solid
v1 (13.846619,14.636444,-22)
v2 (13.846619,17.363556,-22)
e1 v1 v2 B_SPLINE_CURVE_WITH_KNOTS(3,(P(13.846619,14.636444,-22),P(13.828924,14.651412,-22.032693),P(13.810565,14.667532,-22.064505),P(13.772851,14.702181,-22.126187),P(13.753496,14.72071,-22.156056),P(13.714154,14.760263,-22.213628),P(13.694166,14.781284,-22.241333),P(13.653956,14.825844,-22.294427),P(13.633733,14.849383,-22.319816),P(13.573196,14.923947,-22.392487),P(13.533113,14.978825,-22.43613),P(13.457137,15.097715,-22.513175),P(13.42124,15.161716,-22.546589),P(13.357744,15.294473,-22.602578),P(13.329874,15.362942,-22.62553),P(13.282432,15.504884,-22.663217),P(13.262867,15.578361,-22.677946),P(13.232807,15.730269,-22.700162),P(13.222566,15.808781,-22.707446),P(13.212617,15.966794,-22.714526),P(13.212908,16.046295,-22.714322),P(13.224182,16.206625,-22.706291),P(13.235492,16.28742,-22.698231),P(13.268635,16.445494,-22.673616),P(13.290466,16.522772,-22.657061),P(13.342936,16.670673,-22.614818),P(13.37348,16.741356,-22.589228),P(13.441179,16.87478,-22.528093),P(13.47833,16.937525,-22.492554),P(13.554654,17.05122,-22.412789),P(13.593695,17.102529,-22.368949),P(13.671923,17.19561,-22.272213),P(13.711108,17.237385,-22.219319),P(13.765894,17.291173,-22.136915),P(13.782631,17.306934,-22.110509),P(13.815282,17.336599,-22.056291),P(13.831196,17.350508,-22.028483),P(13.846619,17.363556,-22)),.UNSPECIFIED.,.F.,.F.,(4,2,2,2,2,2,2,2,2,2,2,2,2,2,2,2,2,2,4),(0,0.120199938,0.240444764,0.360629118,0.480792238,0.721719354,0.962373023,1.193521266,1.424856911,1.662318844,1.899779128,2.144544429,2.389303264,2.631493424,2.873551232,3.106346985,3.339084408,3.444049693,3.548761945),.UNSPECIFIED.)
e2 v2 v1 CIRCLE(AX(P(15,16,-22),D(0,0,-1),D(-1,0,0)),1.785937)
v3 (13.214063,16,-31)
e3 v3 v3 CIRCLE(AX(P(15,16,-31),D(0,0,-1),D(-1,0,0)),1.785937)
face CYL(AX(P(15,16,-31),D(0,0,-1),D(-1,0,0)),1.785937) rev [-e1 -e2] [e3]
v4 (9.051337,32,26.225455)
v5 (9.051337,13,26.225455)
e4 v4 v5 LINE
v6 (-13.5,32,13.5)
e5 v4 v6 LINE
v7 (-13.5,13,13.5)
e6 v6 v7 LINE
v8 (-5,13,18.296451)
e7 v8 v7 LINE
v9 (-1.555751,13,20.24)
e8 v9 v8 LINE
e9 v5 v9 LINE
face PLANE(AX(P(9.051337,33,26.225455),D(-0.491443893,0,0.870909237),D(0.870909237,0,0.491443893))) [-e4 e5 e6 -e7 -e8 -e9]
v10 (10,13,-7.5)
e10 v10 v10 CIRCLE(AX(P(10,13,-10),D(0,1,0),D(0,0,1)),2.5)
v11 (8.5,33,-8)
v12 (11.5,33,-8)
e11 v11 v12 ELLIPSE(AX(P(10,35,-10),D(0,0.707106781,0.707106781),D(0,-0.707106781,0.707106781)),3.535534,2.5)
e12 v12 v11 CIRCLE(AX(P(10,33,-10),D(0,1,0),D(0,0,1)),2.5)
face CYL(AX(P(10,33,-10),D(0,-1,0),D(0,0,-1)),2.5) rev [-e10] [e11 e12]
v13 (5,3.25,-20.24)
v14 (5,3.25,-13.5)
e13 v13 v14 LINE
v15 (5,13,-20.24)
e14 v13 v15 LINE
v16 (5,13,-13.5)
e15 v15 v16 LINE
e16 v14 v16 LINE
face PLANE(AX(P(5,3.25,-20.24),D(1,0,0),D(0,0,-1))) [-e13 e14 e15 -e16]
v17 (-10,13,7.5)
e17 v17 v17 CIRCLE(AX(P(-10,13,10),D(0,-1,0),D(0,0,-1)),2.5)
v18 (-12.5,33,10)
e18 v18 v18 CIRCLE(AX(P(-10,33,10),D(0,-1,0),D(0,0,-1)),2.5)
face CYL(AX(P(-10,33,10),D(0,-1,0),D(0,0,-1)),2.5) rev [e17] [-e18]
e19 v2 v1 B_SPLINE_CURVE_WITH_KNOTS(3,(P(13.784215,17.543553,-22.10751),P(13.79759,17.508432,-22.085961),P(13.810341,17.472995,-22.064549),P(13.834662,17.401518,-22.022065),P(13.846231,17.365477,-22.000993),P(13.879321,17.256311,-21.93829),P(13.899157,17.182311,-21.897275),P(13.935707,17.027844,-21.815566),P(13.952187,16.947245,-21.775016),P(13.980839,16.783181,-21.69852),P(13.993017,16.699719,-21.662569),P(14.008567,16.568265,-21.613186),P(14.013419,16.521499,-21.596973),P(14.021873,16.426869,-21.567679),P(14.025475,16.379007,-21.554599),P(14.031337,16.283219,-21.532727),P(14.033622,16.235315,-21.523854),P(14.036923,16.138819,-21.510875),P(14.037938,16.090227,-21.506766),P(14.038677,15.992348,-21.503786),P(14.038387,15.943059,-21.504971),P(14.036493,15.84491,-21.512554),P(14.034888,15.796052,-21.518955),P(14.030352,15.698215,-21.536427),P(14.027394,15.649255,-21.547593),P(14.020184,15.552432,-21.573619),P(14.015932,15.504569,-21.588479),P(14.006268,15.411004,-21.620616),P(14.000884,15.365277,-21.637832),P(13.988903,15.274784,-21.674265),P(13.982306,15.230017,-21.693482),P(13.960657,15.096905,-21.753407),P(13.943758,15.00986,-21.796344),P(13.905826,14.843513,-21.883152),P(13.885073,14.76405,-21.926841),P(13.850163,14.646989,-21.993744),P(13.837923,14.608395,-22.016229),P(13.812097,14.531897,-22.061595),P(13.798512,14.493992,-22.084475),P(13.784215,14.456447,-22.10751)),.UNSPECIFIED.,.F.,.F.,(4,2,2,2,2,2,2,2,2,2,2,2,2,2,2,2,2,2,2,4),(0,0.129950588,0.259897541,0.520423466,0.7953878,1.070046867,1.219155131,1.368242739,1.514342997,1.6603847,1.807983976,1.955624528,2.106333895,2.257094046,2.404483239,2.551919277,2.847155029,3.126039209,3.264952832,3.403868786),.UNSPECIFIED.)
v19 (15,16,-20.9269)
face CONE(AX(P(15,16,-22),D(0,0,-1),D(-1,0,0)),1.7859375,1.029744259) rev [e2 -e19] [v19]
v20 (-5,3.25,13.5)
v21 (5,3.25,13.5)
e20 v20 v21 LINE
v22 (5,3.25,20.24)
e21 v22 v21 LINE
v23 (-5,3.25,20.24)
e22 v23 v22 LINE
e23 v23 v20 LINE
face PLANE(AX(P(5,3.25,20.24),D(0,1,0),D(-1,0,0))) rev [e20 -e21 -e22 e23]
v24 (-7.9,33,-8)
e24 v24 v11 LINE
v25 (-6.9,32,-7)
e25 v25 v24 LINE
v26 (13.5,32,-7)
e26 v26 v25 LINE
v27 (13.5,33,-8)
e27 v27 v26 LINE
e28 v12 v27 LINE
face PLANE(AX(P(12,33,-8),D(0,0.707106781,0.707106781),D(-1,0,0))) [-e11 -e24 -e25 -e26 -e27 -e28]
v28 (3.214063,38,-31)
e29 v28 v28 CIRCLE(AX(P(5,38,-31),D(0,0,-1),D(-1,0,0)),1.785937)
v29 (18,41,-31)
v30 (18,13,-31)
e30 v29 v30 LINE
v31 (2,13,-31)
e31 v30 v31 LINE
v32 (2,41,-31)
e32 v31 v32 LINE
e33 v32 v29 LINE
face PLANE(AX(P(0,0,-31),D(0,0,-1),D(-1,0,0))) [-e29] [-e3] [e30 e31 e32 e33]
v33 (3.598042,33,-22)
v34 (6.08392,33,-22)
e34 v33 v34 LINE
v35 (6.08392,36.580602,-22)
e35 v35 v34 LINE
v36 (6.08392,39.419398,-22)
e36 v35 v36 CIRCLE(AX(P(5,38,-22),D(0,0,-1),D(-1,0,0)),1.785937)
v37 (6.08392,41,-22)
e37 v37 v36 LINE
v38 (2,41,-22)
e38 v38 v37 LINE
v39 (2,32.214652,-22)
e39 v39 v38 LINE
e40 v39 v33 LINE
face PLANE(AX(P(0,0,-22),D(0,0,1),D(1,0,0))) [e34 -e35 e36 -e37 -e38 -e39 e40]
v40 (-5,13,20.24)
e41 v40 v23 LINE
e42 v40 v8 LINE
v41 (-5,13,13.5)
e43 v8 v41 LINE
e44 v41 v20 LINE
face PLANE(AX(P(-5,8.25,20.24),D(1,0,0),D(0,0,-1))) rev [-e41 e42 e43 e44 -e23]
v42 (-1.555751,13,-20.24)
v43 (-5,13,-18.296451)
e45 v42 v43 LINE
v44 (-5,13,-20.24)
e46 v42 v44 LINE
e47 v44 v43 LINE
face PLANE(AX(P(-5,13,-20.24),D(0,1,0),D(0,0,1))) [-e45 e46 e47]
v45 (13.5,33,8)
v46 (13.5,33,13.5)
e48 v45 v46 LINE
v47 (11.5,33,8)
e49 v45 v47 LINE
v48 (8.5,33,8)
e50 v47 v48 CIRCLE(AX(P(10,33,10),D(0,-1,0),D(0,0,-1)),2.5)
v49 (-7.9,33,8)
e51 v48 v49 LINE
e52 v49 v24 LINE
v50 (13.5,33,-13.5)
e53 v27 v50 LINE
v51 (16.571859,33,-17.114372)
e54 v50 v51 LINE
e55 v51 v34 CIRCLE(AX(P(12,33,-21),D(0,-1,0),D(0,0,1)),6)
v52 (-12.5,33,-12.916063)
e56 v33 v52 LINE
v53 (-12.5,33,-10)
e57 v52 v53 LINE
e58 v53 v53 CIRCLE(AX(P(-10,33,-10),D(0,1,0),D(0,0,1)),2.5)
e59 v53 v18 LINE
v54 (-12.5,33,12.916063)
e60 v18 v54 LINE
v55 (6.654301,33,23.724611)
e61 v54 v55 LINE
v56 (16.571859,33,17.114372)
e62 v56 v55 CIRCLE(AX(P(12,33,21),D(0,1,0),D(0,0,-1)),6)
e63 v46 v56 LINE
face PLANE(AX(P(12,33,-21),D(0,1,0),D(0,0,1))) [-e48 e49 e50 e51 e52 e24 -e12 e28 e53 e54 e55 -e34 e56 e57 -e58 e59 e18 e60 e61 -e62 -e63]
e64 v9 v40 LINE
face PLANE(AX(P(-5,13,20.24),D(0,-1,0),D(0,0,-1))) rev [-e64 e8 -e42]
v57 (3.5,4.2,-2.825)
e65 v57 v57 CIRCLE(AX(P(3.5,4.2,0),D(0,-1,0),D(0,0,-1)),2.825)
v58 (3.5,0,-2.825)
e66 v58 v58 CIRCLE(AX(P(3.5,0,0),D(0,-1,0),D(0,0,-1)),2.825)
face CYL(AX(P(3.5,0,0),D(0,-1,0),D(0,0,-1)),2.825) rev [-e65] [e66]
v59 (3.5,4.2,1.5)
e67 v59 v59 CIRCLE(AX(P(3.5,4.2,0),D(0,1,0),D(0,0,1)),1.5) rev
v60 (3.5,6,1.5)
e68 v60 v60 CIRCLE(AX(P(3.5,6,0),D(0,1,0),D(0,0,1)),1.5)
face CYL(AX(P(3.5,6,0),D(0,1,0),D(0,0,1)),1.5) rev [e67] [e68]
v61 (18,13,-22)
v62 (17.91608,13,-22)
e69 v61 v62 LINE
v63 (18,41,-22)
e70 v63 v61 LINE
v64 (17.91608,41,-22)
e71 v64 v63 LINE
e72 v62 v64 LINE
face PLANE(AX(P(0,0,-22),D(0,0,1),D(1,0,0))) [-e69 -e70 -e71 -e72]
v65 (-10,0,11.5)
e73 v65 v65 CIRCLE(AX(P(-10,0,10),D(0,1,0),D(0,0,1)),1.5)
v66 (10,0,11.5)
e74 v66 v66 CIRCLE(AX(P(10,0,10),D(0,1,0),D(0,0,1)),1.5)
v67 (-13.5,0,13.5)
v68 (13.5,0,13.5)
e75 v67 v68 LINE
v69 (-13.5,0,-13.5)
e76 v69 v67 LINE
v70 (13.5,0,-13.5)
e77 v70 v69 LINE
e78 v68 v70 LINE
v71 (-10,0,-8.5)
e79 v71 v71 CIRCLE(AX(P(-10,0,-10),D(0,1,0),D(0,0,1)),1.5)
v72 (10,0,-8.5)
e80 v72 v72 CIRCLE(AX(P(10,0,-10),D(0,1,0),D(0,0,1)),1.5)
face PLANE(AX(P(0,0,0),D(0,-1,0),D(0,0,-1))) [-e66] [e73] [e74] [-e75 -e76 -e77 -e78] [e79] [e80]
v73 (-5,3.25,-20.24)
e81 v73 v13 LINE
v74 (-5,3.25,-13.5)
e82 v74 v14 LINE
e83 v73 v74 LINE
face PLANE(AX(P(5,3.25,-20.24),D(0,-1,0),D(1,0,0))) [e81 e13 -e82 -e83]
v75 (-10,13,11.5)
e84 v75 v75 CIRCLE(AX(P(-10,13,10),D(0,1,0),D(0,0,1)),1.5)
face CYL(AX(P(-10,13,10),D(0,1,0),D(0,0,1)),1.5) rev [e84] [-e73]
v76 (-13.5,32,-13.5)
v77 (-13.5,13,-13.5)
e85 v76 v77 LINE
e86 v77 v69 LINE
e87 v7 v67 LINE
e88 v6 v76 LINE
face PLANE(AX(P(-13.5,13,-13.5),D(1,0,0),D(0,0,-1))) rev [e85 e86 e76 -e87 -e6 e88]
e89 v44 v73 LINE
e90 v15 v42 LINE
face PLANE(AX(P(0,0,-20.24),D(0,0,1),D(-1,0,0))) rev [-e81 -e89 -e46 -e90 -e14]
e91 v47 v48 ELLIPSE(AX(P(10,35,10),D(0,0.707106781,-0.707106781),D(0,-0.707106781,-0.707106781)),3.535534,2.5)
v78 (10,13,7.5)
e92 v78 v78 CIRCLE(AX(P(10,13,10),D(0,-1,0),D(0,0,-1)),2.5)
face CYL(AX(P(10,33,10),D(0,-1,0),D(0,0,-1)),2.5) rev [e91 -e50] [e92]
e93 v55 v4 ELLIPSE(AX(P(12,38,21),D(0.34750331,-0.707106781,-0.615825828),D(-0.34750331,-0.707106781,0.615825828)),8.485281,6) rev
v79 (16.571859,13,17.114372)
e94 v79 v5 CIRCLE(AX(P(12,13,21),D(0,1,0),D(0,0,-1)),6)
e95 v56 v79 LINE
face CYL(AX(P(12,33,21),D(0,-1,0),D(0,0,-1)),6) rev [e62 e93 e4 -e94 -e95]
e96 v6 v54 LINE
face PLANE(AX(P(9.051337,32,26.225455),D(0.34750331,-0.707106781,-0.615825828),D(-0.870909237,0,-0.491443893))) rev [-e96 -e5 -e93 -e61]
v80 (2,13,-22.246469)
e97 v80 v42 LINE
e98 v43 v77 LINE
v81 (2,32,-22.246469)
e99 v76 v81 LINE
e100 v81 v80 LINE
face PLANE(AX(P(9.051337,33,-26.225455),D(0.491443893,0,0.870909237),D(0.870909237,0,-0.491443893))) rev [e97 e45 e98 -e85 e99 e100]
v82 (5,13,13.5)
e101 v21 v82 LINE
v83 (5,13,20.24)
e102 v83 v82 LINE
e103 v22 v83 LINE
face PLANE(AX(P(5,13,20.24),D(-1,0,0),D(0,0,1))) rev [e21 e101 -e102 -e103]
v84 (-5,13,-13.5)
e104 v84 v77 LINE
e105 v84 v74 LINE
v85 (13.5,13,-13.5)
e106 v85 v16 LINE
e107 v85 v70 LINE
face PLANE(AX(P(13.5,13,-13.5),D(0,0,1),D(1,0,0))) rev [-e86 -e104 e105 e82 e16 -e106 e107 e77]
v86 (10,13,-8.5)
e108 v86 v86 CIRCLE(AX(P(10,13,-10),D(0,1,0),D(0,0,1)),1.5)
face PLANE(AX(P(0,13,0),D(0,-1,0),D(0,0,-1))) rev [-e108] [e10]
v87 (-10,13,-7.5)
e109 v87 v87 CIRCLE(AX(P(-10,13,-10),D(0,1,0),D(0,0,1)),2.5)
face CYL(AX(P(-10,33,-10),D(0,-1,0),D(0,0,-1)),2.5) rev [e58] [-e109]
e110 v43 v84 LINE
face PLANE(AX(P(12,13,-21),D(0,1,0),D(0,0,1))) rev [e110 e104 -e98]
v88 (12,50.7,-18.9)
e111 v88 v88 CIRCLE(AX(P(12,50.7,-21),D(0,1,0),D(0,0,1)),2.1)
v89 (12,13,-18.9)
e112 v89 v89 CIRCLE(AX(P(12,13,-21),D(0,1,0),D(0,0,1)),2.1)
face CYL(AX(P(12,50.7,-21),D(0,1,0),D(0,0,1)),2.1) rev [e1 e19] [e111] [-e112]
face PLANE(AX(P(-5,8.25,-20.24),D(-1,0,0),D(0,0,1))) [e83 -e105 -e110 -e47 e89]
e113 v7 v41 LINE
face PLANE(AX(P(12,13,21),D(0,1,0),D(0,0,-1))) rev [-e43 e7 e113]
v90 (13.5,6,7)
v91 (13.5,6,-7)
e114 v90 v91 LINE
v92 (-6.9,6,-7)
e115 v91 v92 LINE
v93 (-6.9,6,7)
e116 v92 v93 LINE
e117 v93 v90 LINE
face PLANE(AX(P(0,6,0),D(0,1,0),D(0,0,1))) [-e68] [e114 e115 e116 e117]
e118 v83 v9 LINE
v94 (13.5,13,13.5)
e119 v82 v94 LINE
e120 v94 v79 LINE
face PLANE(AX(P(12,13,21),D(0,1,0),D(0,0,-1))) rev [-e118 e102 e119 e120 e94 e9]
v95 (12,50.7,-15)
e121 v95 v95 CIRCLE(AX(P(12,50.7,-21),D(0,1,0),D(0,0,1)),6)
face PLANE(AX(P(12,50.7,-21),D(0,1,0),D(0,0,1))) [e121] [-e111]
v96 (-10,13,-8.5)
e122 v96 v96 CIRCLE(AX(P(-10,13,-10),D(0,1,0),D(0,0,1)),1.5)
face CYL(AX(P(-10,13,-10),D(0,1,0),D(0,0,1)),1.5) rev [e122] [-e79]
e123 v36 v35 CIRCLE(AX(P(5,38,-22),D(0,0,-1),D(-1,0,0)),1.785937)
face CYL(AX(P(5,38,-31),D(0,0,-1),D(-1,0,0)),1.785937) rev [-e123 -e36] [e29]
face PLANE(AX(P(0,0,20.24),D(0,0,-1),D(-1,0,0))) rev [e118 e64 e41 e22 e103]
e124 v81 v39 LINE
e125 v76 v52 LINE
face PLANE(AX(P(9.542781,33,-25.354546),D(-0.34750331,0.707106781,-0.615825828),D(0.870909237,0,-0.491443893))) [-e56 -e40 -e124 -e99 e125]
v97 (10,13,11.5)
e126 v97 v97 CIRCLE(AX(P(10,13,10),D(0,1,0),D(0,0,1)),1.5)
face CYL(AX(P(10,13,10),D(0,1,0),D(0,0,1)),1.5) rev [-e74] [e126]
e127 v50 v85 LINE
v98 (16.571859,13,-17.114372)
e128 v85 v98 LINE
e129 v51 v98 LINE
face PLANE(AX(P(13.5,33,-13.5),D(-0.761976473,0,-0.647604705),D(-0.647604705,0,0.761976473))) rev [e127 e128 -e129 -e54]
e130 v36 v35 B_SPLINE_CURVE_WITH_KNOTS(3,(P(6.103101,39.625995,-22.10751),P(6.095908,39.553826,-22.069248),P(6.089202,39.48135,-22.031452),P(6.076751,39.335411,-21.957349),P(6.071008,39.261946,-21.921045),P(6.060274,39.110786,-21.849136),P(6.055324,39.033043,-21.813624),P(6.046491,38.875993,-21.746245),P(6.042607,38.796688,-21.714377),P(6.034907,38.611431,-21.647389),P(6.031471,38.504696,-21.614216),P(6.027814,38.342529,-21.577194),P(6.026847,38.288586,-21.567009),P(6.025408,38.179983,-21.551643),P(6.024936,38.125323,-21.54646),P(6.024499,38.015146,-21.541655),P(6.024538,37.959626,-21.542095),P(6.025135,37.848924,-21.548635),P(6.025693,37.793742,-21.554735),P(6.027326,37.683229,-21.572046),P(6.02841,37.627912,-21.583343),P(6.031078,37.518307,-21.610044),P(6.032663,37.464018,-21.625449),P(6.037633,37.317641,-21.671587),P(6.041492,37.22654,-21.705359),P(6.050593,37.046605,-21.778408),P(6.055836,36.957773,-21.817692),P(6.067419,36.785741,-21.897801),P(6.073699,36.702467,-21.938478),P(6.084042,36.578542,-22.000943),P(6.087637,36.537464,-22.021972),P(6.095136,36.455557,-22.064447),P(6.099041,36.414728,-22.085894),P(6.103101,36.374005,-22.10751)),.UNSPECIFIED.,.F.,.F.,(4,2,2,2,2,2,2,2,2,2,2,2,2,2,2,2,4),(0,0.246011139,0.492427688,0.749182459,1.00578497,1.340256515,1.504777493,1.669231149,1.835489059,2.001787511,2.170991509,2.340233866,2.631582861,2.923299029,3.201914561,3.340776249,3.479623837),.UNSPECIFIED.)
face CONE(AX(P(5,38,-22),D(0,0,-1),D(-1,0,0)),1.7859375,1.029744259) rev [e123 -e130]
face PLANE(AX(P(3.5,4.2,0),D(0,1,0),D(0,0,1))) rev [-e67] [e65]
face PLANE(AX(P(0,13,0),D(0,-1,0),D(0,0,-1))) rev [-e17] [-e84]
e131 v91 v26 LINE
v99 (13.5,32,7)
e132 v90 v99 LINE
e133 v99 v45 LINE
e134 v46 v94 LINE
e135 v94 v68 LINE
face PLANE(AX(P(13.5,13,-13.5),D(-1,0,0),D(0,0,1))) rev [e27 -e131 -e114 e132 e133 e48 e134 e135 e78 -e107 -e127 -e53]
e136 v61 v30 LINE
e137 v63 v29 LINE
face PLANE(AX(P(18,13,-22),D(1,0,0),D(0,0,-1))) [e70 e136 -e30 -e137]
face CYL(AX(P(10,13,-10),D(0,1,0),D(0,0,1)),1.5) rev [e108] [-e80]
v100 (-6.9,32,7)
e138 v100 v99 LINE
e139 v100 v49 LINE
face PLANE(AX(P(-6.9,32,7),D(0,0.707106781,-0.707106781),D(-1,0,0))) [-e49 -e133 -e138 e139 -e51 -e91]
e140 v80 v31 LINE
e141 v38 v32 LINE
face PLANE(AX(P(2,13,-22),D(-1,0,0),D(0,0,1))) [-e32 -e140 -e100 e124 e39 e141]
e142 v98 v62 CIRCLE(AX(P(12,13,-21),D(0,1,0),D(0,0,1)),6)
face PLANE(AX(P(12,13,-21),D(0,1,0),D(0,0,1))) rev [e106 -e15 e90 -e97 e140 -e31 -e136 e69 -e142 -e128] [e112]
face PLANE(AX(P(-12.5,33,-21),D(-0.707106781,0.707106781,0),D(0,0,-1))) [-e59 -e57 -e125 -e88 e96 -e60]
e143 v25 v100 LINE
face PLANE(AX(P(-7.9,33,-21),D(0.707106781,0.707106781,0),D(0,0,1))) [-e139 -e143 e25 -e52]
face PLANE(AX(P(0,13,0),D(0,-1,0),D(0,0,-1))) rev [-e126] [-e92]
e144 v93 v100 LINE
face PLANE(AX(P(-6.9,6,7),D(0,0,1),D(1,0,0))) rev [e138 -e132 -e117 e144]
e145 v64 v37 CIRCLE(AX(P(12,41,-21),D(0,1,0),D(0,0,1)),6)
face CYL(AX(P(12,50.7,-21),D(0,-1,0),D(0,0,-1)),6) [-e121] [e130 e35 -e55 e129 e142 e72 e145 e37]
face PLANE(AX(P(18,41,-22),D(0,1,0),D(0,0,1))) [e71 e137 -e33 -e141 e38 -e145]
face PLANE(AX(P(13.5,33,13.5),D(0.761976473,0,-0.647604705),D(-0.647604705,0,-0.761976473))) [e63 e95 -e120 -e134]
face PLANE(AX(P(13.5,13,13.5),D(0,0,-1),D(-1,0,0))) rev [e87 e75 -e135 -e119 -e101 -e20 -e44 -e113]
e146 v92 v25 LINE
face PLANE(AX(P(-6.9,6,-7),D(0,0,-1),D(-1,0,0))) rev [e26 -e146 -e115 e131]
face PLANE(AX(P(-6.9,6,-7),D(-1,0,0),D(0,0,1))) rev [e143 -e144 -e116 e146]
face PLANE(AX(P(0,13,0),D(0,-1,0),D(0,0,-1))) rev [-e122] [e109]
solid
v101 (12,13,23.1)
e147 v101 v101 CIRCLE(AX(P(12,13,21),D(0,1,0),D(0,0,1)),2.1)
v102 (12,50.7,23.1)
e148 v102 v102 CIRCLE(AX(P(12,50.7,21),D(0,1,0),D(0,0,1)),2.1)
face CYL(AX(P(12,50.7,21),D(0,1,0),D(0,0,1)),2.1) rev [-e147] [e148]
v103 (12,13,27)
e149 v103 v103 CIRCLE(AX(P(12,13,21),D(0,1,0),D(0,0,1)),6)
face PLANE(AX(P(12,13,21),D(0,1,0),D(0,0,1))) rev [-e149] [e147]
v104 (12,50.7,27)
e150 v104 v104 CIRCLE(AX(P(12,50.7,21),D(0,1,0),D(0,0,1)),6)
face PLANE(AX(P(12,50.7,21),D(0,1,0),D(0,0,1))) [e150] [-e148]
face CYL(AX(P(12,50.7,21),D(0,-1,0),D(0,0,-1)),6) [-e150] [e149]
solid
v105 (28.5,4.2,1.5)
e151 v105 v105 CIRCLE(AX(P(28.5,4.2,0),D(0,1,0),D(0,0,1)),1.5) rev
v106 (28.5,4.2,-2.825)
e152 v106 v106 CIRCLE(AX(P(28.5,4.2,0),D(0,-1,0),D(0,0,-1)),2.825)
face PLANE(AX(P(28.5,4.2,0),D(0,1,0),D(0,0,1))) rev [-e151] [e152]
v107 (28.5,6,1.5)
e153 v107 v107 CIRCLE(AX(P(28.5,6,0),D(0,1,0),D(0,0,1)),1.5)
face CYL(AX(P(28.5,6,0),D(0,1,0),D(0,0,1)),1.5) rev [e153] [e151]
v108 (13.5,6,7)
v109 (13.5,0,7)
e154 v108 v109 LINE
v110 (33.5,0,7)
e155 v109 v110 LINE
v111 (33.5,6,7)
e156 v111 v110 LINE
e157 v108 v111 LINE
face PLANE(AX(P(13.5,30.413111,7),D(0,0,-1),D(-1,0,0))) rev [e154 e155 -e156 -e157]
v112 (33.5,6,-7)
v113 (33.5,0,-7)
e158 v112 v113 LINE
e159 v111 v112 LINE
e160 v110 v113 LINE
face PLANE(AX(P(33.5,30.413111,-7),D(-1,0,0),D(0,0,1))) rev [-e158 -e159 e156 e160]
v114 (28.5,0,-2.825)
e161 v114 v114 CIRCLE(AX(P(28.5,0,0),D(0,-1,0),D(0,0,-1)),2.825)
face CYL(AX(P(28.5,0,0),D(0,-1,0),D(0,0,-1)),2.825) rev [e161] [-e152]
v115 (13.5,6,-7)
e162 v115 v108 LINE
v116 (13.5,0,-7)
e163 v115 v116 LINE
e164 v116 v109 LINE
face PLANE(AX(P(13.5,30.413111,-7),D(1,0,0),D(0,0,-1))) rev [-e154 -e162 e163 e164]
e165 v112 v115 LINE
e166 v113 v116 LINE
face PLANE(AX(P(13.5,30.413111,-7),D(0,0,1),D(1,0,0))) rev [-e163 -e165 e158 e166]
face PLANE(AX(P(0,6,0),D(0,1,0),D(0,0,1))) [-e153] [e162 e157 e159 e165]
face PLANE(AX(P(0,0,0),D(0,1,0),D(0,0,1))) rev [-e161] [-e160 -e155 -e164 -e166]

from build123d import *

# Parameters (mm, degrees)
SKETCH1_W                              = 27
SKETCH1_H                              = 27
BOSS_EXTRUDE1_DEPTH                    = 13
SKETCH2_W                              = 20.4
SKETCH2_H                              = 14
CUT_EXTRUDE1_DEPTH                     = 7
F_3_0MM_DOWEL_HOLE1_D                  = 3
F_3_0MM_DOWEL_HOLE1_DEPTH              = 20
F_3_0MM_DOWEL_HOLE1_TIP                = 0.901290929
SKETCH5_W                              = 20
SKETCH5_H                              = 14
BOSS_EXTRUDE2_DEPTH                    = 6
SKETCH10_W                             = 1.5
SKETCH10_H                             = 13
F_3_0MM_DOWEL_HOLE3_AT_2_COUNT         = 2
F_3_0MM_DOWEL_HOLE3_AT_2_PITCH         = 20
F_3_0MM_DOWEL_HOLE3_AT_3_COUNT         = 2
F_3_0MM_DOWEL_HOLE3_AT_3_PITCH         = 28.284271247
F_3_0MM_DOWEL_HOLE3_AT_4_COUNT         = 2
F_3_0MM_DOWEL_HOLE3_AT_4_PITCH         = 20
SKETCH12_R                             = 6
BOSS_EXTRUDE3_DEPTH                    = 37.7
SKETCH13_R                             = 2.5
BOSS_EXTRUDE4_DEPTH                    = 20
LPATTERN1_COUNT                        = 2
LPATTERN1_PITCH                        = 42
CHAMFER1_SIZE                          = 1
BOSS_EXTRUDE5_DEPTH                    = 6.74
SKETCH20_W                             = 2.825
SKETCH20_H                             = 4.2
HOLE1_AT_2_COUNT                       = 2
HOLE1_AT_2_PITCH                       = 25
SKETCH21_W                             = 16
SKETCH21_H                             = 28
BOSS_EXTRUDE7_DEPTH                    = 5
SKETCH17_W                             = 2.1
SKETCH17_H                             = 50.7
M5X0_8_TAPPED_HOLE2_AT_2_COUNT         = 2
M5X0_8_TAPPED_HOLE2_AT_2_PITCH         = 42
BOSS_EXTRUDE8_DEPTH                    = 4
F_3_32_0_140625_DOWEL_HOLE1_AT_2_COUNT = 2
F_3_32_0_140625_DOWEL_HOLE1_AT_2_PITCH = 24.166091947


with BuildPart() as part:
    # Sketch1 → Boss-Extrude1 (new body)
    with BuildSketch(Plane(origin=(0, 0, 0), x_dir=(1, 0, 0), z_dir=(0, 1, 0))):
        Rectangle(SKETCH1_W, SKETCH1_H)
    extrude(amount=BOSS_EXTRUDE1_DEPTH)

    # Sketch2 → Cut-Extrude1 (cut)
    with BuildSketch(Plane(origin=(0, 13, 0), x_dir=(1, 0, 0), z_dir=(0, 1, 0))):
        with Locations((3.3, 0)):
            Rectangle(SKETCH2_W, SKETCH2_H)
    extrude(amount=-CUT_EXTRUDE1_DEPTH, mode=Mode.SUBTRACT)

    # Ø3.0mm Dowel Hole1
    with Locations(Plane(origin=(0, 6, 0), x_dir=(1, 0, 0), z_dir=(0, 1, 0))):
        with Locations((3.5, 0)):
            Hole(F_3_0MM_DOWEL_HOLE1_D / 2, depth=F_3_0MM_DOWEL_HOLE1_DEPTH)
            with Locations((0, 0, -(F_3_0MM_DOWEL_HOLE1_DEPTH + F_3_0MM_DOWEL_HOLE1_TIP / 2))):  # 118° drill point
                Cone(0, F_3_0MM_DOWEL_HOLE1_D / 2, F_3_0MM_DOWEL_HOLE1_TIP, mode=Mode.SUBTRACT)

    # Sketch10 → Ø3.0mm Dowel Hole3 (revolve, cut)
    with BuildSketch(Plane(origin=(-10, 13, -10), x_dir=(0, 0, 1), z_dir=(1, 0, 0))):
        with Locations((0.75, 6.5)):
            Rectangle(SKETCH10_W, SKETCH10_H)
    f_3_0mm_dowel_hole3 = revolve(axis=Axis((-10, 19.35, -10), (0, -1, 0)), mode=Mode.SUBTRACT)

    # Ø3.0mm Dowel Hole3 at 2: Ø3.0mm Dowel Hole3 ×2
    with Locations(*[(0, 0, i * F_3_0MM_DOWEL_HOLE3_AT_2_PITCH) for i in range(1, F_3_0MM_DOWEL_HOLE3_AT_2_COUNT)]):
        add(f_3_0mm_dowel_hole3, mode=Mode.SUBTRACT)

    # Ø3.0mm Dowel Hole3 at 3: Ø3.0mm Dowel Hole3 ×2
    with Locations(*[Vector(0.7071067811865477, 0, 0.7071067811865474) * (i * F_3_0MM_DOWEL_HOLE3_AT_3_PITCH) for i in range(1, F_3_0MM_DOWEL_HOLE3_AT_3_COUNT)]):
        add(f_3_0mm_dowel_hole3, mode=Mode.SUBTRACT)

    # Ø3.0mm Dowel Hole3 at 4: Ø3.0mm Dowel Hole3 ×2
    with Locations(*[(i * F_3_0MM_DOWEL_HOLE3_AT_4_PITCH, 0, 0) for i in range(1, F_3_0MM_DOWEL_HOLE3_AT_4_COUNT)]):
        add(f_3_0mm_dowel_hole3, mode=Mode.SUBTRACT)



with BuildPart() as body_2:
    # Sketch5 → Boss-Extrude2 (new body)
    with BuildSketch(Plane(origin=(0, 0, 0), x_dir=(1, 0, 0), z_dir=(0, 1, 0))):
        with Locations((23.5, 0)):
            Rectangle(SKETCH5_W, SKETCH5_H)
    extrude(amount=BOSS_EXTRUDE2_DEPTH)

    # Sketch7 → Ø3.0mm Dowel Hole2 (revolve, cut)
    with BuildSketch(Plane(origin=(28.5, 6, 0), x_dir=(0, 0, 1), z_dir=(1, 0, 0))):
        Polygon((0, 0), (0, 20.901290929), (1.5, 20), (1.5, 0), align=None)
    revolve(axis=Axis((28.5, 12.35, 0), (0, -1, 0)), mode=Mode.SUBTRACT)


with BuildPart() as body_3:
    # Sketch12 → Boss-Extrude3 (new body)
    with BuildSketch(Plane(origin=(0, 13, 0), x_dir=(1, 0, 0), z_dir=(0, 1, 0))):
        with Locations(Location((12, 21, 0), (0, 0, 270))):
            Circle(SKETCH12_R)
    boss_extrude3 = extrude(amount=BOSS_EXTRUDE3_DEPTH)


with BuildPart() as part_1:
    add(part.part)

    add(body_3.part)  # Boss-Extrude4 merges body 3
    # Sketch13 → Boss-Extrude4 (add)
    with BuildSketch(Plane(origin=(0, 13, 0), x_dir=(1, 0, 0), z_dir=(0, 1, 0))):
        with BuildLine():
            Line((13.5, 7), (13.5, 13.5))
            Line((13.5, 13.5), (16.571858839, 17.114371768))
            ThreePointArc((16.571858839, 17.114371768), (7.372727343, 17.180530435), (9.05133664, 26.225455424))
            Line((9.05133664, 26.225455424), (-13.5, 13.5))
            Line((-13.5, 13.5), (-13.5, 0))
            Line((-13.5, 0), (-6.9, 0))
            Line((-6.9, 0), (-6.9, 7))
            Line((-6.9, 7), (13.5, 7))
        make_face()
        with Locations(Location((-10, 10, 0), (0, 0, 270))):
            Circle(SKETCH13_R, mode=Mode.SUBTRACT)
        with Locations(Location((10, 10, 0), (0, 0, 270))):
            Circle(SKETCH13_R, mode=Mode.SUBTRACT)
    boss_extrude4 = extrude(amount=BOSS_EXTRUDE4_DEPTH)

    # Mirror5: Boss-Extrude4 across plane
    add(boss_extrude4.mirror(Plane.XY))

    # Chamfer1
    # the kernel refuses this chamfer: 1 mm, written as the material it takes off along each edge
    with BuildSketch(Plane(origin=(-6.9, 33, -7), x_dir=(0, 0, -1), z_dir=(1, 0, 0))) as chamfer1_piece_1:
        Polygon((CHAMFER1_SIZE, 0), (0, -CHAMFER1_SIZE), (0, 0), align=None)
    extrude(amount=22.971682988, mode=Mode.SUBTRACT)
    with BuildSketch(Plane(origin=(12.858830839, 33, -28.373979854), x_dir=(0, -1, 0), z_dir=(-0.870909237349507, 0, 0.4914438933380902))) as chamfer1_piece_2_section:
        Polygon((CHAMFER1_SIZE, 0), (0, CHAMFER1_SIZE), (0, 0), align=None)
    chamfer1_piece_2 = extrude(amount=32.83755882, mode=Mode.PRIVATE)
    chamfer1_piece_2 = chamfer1_piece_2 - Plane(origin=(12, 33, -21), x_dir=(0, 0, 1), z_dir=(0, -1, 0)) * Cylinder(6, 70, mode=Mode.PRIVATE)
    add(chamfer1_piece_2, mode=Mode.SUBTRACT)
    with BuildSketch(Plane(origin=(-13.5, 33, 16.071682988), x_dir=(1, 0, 0), z_dir=(0, 0, -1))) as chamfer1_piece_3:
        Polygon((CHAMFER1_SIZE, 0), (0, CHAMFER1_SIZE), (0, 0), align=None)
    extrude(amount=32.143365976, mode=Mode.SUBTRACT)
    with BuildSketch(Plane(origin=(-6.9, 33, 7), x_dir=(-1, 0, 0), z_dir=(0, 0, -1))) as chamfer1_piece_4:
        Polygon((CHAMFER1_SIZE, 0), (0, -CHAMFER1_SIZE), (0, 0), align=None)
    extrude(amount=14, mode=Mode.SUBTRACT)
    with BuildSketch(Plane(origin=(-6.9, 33, 7), x_dir=(0, 0, 1), z_dir=(1, 0, 0))) as chamfer1_piece_5:
        Polygon((CHAMFER1_SIZE, 0), (0, CHAMFER1_SIZE), (0, 0), align=None)
    extrude(amount=22.971682988, mode=Mode.SUBTRACT)
    with BuildSketch(Plane(origin=(12.858830839, 33, 28.373979854), x_dir=(0.49144389333809024, 0, -0.8709092373495071), z_dir=(-0.870909237349507, 0, -0.4914438933380902))) as chamfer1_piece_6:
        Polygon((CHAMFER1_SIZE, 0), (0, CHAMFER1_SIZE), (0, 0), align=None)
    extrude(amount=32.83755882, mode=Mode.SUBTRACT)
    with BuildSketch(Plane(origin=(-6.9, 33, 7), x_dir=(-1, 0, 0), z_dir=(0, 0, -1))) as chamfer1_piece_7a_section:
        Polygon((CHAMFER1_SIZE, 0), (0, -CHAMFER1_SIZE), (0, 0), align=None)
    chamfer1_piece_7a = extrude(amount=16.571682988, mode=Mode.PRIVATE)
    chamfer1_piece_7a = chamfer1_piece_7a - Plane(origin=(-10, 33, -10), x_dir=(0, 0, 1), z_dir=(0, -1, 0)) * Cylinder(2.5, 38, mode=Mode.PRIVATE)
    chamfer1_piece_7a = split(chamfer1_piece_7a, bisect_by=Plane(origin=(-6.9, 33, -7), z_dir=(0, 0, -1)), keep=Keep.TOP, mode=Mode.PRIVATE)
    with BuildSketch(Plane(origin=(-9.471682988, 33, -7), x_dir=(0, 0, -1), z_dir=(1, 0, 0))) as chamfer1_piece_7b_section:
        Polygon((CHAMFER1_SIZE, 0), (0, -CHAMFER1_SIZE), (0, 0), align=None)
    chamfer1_piece_7b = extrude(amount=22.971682988, mode=Mode.PRIVATE)
    chamfer1_piece_7b = chamfer1_piece_7b - Plane(origin=(-10, 33, -10), x_dir=(0, 0, 1), z_dir=(0, -1, 0)) * Cylinder(2.5, 50, mode=Mode.PRIVATE)
    chamfer1_piece_7b = split(chamfer1_piece_7b, bisect_by=Plane(origin=(-6.9, 33, -7), z_dir=(-1, 0, 0)), keep=Keep.TOP, mode=Mode.PRIVATE)
    chamfer1_piece_7 = chamfer1_piece_7a & chamfer1_piece_7b
    add(chamfer1_piece_7, mode=Mode.SUBTRACT)
    with BuildSketch(Plane(origin=(-9.471682988, 33, 7), x_dir=(0, 0, 1), z_dir=(1, 0, 0))) as chamfer1_piece_8a_section:
        Polygon((CHAMFER1_SIZE, 0), (0, CHAMFER1_SIZE), (0, 0), align=None)
    chamfer1_piece_8a = extrude(amount=22.971682988, mode=Mode.PRIVATE)
    chamfer1_piece_8a = chamfer1_piece_8a - Plane(origin=(-10, 33, 10), x_dir=(0, 0, -1), z_dir=(0, -1, 0)) * Cylinder(2.5, 50, mode=Mode.PRIVATE)
    chamfer1_piece_8a = split(chamfer1_piece_8a, bisect_by=Plane(origin=(-6.9, 33, 7), z_dir=(-1, 0, 0)), keep=Keep.TOP, mode=Mode.PRIVATE)
    with BuildSketch(Plane(origin=(-6.9, 33, 9.571682988), x_dir=(-1, 0, 0), z_dir=(0, 0, -1))) as chamfer1_piece_8b_section:
        Polygon((CHAMFER1_SIZE, 0), (0, -CHAMFER1_SIZE), (0, 0), align=None)
    chamfer1_piece_8b = extrude(amount=16.571682988, mode=Mode.PRIVATE)
    chamfer1_piece_8b = chamfer1_piece_8b - Plane(origin=(-10, 33, 10), x_dir=(0, 0, -1), z_dir=(0, -1, 0)) * Cylinder(2.5, 38, mode=Mode.PRIVATE)
    chamfer1_piece_8b = split(chamfer1_piece_8b, bisect_by=Plane(origin=(-6.9, 33, 7), z_dir=(0, 0, 1)), keep=Keep.TOP, mode=Mode.PRIVATE)
    chamfer1_piece_8 = chamfer1_piece_8a & chamfer1_piece_8b
    add(chamfer1_piece_8, mode=Mode.SUBTRACT)

    # Sketch18 → Boss-Extrude5 (add)
    with BuildSketch(Plane.XY.offset(13.5)):
        Polygon((-5, 8.25), (-5, 13), (5, 13), (5, 8.25), (5, 3.25), (-5, 3.25), align=None)
    boss_extrude5 = extrude(amount=BOSS_EXTRUDE5_DEPTH)

    # Mirror7: Boss-Extrude5 across plane
    add(boss_extrude5.mirror(Plane.XY))

    # Sketch20 → Hole1 (revolve, cut)
    with BuildSketch(Plane(origin=(3.5, 0, 0), x_dir=(0, 0, -1), z_dir=(1, 0, 0))):
        with Locations((1.4125, 2.1)):
            Rectangle(SKETCH20_W, SKETCH20_H)
    hole1 = revolve(axis=Axis((3.5, 110, 0), (0, -1, 0)), mode=Mode.SUBTRACT)

    # Sketch21 → Boss-Extrude7 (add)
    with BuildSketch(Plane(origin=(0, 0, -27), x_dir=(-1, 0, 0), z_dir=(0, 0, -1))):
        with Locations((-10, 27)):
            Rectangle(SKETCH21_W, SKETCH21_H)
    extrude(amount=-BOSS_EXTRUDE7_DEPTH)

    # Sketch17 → M5x0.8 Tapped Hole2 (revolve, cut)
    with BuildSketch(Plane(origin=(12, 50.7, -21), x_dir=(0, 0, 1), z_dir=(1, 0, 0))):
        with Locations((1.05, 25.35)):
            Rectangle(SKETCH17_W, SKETCH17_H)
    m5x0_8_tapped_hole2 = revolve(axis=Axis((12, 57.05, -21), (0, -1, 0)), mode=Mode.SUBTRACT)

    # Sketch22 → Boss-Extrude8 (add)
    with BuildSketch(Plane(origin=(0, 0, -27), x_dir=(-1, 0, 0), z_dir=(0, 0, -1))):
        Polygon((-2, 41), (-12, 41), (-18, 41), (-18, 13), (-2, 13), align=None)
    extrude(amount=BOSS_EXTRUDE8_DEPTH)

    # Sketch25 → 3/32 (0.140625) Dowel Hole1 (revolve, cut)
    with BuildSketch(Plane(origin=(15, 16, -31), x_dir=(0, 1, 0), z_dir=(1, 0, 0))):
        Polygon((0, 0), (0, 10.073099512), (1.7859375, 9), (1.7859375, 0), align=None)
    f_3_32_0_140625_dowel_hole1 = revolve(axis=Axis((15, 16, -37.35), (0, 0, 1)), mode=Mode.SUBTRACT)

    # 3/32 (0.140625) Dowel Hole1 at 2: 3/32 (0.140625) Dowel Hole1 ×2
    with Locations(*[Vector(-0.4138029443011841, 0.9103664774626048, 0) * (i * F_3_32_0_140625_DOWEL_HOLE1_AT_2_PITCH) for i in range(1, F_3_32_0_140625_DOWEL_HOLE1_AT_2_COUNT)]):
        add(f_3_32_0_140625_dowel_hole1, mode=Mode.SUBTRACT)


with BuildPart() as lpattern1_1:
    # LPattern1: Boss-Extrude3 ×2
    with Locations(*[(0, 0, i * LPATTERN1_PITCH) for i in range(1, LPATTERN1_COUNT)]):
        add(boss_extrude3)

    # M5x0.8 Tapped Hole2 at 2: M5x0.8 Tapped Hole2 ×2
    with Locations(*[(0, 0, i * M5X0_8_TAPPED_HOLE2_AT_2_PITCH) for i in range(1, M5X0_8_TAPPED_HOLE2_AT_2_COUNT)]):
        add(m5x0_8_tapped_hole2, mode=Mode.SUBTRACT)


with BuildPart() as body_2_1:
    add(body_2.part)

    # Hole1 at 2: Hole1 ×2
    with Locations(*[(i * HOLE1_AT_2_PITCH, 0, 0) for i in range(1, HOLE1_AT_2_COUNT)]):
        add(hole1, mode=Mode.SUBTRACT)


solid = Compound([part_1.part, lpattern1_1.part, body_2_1.part])
